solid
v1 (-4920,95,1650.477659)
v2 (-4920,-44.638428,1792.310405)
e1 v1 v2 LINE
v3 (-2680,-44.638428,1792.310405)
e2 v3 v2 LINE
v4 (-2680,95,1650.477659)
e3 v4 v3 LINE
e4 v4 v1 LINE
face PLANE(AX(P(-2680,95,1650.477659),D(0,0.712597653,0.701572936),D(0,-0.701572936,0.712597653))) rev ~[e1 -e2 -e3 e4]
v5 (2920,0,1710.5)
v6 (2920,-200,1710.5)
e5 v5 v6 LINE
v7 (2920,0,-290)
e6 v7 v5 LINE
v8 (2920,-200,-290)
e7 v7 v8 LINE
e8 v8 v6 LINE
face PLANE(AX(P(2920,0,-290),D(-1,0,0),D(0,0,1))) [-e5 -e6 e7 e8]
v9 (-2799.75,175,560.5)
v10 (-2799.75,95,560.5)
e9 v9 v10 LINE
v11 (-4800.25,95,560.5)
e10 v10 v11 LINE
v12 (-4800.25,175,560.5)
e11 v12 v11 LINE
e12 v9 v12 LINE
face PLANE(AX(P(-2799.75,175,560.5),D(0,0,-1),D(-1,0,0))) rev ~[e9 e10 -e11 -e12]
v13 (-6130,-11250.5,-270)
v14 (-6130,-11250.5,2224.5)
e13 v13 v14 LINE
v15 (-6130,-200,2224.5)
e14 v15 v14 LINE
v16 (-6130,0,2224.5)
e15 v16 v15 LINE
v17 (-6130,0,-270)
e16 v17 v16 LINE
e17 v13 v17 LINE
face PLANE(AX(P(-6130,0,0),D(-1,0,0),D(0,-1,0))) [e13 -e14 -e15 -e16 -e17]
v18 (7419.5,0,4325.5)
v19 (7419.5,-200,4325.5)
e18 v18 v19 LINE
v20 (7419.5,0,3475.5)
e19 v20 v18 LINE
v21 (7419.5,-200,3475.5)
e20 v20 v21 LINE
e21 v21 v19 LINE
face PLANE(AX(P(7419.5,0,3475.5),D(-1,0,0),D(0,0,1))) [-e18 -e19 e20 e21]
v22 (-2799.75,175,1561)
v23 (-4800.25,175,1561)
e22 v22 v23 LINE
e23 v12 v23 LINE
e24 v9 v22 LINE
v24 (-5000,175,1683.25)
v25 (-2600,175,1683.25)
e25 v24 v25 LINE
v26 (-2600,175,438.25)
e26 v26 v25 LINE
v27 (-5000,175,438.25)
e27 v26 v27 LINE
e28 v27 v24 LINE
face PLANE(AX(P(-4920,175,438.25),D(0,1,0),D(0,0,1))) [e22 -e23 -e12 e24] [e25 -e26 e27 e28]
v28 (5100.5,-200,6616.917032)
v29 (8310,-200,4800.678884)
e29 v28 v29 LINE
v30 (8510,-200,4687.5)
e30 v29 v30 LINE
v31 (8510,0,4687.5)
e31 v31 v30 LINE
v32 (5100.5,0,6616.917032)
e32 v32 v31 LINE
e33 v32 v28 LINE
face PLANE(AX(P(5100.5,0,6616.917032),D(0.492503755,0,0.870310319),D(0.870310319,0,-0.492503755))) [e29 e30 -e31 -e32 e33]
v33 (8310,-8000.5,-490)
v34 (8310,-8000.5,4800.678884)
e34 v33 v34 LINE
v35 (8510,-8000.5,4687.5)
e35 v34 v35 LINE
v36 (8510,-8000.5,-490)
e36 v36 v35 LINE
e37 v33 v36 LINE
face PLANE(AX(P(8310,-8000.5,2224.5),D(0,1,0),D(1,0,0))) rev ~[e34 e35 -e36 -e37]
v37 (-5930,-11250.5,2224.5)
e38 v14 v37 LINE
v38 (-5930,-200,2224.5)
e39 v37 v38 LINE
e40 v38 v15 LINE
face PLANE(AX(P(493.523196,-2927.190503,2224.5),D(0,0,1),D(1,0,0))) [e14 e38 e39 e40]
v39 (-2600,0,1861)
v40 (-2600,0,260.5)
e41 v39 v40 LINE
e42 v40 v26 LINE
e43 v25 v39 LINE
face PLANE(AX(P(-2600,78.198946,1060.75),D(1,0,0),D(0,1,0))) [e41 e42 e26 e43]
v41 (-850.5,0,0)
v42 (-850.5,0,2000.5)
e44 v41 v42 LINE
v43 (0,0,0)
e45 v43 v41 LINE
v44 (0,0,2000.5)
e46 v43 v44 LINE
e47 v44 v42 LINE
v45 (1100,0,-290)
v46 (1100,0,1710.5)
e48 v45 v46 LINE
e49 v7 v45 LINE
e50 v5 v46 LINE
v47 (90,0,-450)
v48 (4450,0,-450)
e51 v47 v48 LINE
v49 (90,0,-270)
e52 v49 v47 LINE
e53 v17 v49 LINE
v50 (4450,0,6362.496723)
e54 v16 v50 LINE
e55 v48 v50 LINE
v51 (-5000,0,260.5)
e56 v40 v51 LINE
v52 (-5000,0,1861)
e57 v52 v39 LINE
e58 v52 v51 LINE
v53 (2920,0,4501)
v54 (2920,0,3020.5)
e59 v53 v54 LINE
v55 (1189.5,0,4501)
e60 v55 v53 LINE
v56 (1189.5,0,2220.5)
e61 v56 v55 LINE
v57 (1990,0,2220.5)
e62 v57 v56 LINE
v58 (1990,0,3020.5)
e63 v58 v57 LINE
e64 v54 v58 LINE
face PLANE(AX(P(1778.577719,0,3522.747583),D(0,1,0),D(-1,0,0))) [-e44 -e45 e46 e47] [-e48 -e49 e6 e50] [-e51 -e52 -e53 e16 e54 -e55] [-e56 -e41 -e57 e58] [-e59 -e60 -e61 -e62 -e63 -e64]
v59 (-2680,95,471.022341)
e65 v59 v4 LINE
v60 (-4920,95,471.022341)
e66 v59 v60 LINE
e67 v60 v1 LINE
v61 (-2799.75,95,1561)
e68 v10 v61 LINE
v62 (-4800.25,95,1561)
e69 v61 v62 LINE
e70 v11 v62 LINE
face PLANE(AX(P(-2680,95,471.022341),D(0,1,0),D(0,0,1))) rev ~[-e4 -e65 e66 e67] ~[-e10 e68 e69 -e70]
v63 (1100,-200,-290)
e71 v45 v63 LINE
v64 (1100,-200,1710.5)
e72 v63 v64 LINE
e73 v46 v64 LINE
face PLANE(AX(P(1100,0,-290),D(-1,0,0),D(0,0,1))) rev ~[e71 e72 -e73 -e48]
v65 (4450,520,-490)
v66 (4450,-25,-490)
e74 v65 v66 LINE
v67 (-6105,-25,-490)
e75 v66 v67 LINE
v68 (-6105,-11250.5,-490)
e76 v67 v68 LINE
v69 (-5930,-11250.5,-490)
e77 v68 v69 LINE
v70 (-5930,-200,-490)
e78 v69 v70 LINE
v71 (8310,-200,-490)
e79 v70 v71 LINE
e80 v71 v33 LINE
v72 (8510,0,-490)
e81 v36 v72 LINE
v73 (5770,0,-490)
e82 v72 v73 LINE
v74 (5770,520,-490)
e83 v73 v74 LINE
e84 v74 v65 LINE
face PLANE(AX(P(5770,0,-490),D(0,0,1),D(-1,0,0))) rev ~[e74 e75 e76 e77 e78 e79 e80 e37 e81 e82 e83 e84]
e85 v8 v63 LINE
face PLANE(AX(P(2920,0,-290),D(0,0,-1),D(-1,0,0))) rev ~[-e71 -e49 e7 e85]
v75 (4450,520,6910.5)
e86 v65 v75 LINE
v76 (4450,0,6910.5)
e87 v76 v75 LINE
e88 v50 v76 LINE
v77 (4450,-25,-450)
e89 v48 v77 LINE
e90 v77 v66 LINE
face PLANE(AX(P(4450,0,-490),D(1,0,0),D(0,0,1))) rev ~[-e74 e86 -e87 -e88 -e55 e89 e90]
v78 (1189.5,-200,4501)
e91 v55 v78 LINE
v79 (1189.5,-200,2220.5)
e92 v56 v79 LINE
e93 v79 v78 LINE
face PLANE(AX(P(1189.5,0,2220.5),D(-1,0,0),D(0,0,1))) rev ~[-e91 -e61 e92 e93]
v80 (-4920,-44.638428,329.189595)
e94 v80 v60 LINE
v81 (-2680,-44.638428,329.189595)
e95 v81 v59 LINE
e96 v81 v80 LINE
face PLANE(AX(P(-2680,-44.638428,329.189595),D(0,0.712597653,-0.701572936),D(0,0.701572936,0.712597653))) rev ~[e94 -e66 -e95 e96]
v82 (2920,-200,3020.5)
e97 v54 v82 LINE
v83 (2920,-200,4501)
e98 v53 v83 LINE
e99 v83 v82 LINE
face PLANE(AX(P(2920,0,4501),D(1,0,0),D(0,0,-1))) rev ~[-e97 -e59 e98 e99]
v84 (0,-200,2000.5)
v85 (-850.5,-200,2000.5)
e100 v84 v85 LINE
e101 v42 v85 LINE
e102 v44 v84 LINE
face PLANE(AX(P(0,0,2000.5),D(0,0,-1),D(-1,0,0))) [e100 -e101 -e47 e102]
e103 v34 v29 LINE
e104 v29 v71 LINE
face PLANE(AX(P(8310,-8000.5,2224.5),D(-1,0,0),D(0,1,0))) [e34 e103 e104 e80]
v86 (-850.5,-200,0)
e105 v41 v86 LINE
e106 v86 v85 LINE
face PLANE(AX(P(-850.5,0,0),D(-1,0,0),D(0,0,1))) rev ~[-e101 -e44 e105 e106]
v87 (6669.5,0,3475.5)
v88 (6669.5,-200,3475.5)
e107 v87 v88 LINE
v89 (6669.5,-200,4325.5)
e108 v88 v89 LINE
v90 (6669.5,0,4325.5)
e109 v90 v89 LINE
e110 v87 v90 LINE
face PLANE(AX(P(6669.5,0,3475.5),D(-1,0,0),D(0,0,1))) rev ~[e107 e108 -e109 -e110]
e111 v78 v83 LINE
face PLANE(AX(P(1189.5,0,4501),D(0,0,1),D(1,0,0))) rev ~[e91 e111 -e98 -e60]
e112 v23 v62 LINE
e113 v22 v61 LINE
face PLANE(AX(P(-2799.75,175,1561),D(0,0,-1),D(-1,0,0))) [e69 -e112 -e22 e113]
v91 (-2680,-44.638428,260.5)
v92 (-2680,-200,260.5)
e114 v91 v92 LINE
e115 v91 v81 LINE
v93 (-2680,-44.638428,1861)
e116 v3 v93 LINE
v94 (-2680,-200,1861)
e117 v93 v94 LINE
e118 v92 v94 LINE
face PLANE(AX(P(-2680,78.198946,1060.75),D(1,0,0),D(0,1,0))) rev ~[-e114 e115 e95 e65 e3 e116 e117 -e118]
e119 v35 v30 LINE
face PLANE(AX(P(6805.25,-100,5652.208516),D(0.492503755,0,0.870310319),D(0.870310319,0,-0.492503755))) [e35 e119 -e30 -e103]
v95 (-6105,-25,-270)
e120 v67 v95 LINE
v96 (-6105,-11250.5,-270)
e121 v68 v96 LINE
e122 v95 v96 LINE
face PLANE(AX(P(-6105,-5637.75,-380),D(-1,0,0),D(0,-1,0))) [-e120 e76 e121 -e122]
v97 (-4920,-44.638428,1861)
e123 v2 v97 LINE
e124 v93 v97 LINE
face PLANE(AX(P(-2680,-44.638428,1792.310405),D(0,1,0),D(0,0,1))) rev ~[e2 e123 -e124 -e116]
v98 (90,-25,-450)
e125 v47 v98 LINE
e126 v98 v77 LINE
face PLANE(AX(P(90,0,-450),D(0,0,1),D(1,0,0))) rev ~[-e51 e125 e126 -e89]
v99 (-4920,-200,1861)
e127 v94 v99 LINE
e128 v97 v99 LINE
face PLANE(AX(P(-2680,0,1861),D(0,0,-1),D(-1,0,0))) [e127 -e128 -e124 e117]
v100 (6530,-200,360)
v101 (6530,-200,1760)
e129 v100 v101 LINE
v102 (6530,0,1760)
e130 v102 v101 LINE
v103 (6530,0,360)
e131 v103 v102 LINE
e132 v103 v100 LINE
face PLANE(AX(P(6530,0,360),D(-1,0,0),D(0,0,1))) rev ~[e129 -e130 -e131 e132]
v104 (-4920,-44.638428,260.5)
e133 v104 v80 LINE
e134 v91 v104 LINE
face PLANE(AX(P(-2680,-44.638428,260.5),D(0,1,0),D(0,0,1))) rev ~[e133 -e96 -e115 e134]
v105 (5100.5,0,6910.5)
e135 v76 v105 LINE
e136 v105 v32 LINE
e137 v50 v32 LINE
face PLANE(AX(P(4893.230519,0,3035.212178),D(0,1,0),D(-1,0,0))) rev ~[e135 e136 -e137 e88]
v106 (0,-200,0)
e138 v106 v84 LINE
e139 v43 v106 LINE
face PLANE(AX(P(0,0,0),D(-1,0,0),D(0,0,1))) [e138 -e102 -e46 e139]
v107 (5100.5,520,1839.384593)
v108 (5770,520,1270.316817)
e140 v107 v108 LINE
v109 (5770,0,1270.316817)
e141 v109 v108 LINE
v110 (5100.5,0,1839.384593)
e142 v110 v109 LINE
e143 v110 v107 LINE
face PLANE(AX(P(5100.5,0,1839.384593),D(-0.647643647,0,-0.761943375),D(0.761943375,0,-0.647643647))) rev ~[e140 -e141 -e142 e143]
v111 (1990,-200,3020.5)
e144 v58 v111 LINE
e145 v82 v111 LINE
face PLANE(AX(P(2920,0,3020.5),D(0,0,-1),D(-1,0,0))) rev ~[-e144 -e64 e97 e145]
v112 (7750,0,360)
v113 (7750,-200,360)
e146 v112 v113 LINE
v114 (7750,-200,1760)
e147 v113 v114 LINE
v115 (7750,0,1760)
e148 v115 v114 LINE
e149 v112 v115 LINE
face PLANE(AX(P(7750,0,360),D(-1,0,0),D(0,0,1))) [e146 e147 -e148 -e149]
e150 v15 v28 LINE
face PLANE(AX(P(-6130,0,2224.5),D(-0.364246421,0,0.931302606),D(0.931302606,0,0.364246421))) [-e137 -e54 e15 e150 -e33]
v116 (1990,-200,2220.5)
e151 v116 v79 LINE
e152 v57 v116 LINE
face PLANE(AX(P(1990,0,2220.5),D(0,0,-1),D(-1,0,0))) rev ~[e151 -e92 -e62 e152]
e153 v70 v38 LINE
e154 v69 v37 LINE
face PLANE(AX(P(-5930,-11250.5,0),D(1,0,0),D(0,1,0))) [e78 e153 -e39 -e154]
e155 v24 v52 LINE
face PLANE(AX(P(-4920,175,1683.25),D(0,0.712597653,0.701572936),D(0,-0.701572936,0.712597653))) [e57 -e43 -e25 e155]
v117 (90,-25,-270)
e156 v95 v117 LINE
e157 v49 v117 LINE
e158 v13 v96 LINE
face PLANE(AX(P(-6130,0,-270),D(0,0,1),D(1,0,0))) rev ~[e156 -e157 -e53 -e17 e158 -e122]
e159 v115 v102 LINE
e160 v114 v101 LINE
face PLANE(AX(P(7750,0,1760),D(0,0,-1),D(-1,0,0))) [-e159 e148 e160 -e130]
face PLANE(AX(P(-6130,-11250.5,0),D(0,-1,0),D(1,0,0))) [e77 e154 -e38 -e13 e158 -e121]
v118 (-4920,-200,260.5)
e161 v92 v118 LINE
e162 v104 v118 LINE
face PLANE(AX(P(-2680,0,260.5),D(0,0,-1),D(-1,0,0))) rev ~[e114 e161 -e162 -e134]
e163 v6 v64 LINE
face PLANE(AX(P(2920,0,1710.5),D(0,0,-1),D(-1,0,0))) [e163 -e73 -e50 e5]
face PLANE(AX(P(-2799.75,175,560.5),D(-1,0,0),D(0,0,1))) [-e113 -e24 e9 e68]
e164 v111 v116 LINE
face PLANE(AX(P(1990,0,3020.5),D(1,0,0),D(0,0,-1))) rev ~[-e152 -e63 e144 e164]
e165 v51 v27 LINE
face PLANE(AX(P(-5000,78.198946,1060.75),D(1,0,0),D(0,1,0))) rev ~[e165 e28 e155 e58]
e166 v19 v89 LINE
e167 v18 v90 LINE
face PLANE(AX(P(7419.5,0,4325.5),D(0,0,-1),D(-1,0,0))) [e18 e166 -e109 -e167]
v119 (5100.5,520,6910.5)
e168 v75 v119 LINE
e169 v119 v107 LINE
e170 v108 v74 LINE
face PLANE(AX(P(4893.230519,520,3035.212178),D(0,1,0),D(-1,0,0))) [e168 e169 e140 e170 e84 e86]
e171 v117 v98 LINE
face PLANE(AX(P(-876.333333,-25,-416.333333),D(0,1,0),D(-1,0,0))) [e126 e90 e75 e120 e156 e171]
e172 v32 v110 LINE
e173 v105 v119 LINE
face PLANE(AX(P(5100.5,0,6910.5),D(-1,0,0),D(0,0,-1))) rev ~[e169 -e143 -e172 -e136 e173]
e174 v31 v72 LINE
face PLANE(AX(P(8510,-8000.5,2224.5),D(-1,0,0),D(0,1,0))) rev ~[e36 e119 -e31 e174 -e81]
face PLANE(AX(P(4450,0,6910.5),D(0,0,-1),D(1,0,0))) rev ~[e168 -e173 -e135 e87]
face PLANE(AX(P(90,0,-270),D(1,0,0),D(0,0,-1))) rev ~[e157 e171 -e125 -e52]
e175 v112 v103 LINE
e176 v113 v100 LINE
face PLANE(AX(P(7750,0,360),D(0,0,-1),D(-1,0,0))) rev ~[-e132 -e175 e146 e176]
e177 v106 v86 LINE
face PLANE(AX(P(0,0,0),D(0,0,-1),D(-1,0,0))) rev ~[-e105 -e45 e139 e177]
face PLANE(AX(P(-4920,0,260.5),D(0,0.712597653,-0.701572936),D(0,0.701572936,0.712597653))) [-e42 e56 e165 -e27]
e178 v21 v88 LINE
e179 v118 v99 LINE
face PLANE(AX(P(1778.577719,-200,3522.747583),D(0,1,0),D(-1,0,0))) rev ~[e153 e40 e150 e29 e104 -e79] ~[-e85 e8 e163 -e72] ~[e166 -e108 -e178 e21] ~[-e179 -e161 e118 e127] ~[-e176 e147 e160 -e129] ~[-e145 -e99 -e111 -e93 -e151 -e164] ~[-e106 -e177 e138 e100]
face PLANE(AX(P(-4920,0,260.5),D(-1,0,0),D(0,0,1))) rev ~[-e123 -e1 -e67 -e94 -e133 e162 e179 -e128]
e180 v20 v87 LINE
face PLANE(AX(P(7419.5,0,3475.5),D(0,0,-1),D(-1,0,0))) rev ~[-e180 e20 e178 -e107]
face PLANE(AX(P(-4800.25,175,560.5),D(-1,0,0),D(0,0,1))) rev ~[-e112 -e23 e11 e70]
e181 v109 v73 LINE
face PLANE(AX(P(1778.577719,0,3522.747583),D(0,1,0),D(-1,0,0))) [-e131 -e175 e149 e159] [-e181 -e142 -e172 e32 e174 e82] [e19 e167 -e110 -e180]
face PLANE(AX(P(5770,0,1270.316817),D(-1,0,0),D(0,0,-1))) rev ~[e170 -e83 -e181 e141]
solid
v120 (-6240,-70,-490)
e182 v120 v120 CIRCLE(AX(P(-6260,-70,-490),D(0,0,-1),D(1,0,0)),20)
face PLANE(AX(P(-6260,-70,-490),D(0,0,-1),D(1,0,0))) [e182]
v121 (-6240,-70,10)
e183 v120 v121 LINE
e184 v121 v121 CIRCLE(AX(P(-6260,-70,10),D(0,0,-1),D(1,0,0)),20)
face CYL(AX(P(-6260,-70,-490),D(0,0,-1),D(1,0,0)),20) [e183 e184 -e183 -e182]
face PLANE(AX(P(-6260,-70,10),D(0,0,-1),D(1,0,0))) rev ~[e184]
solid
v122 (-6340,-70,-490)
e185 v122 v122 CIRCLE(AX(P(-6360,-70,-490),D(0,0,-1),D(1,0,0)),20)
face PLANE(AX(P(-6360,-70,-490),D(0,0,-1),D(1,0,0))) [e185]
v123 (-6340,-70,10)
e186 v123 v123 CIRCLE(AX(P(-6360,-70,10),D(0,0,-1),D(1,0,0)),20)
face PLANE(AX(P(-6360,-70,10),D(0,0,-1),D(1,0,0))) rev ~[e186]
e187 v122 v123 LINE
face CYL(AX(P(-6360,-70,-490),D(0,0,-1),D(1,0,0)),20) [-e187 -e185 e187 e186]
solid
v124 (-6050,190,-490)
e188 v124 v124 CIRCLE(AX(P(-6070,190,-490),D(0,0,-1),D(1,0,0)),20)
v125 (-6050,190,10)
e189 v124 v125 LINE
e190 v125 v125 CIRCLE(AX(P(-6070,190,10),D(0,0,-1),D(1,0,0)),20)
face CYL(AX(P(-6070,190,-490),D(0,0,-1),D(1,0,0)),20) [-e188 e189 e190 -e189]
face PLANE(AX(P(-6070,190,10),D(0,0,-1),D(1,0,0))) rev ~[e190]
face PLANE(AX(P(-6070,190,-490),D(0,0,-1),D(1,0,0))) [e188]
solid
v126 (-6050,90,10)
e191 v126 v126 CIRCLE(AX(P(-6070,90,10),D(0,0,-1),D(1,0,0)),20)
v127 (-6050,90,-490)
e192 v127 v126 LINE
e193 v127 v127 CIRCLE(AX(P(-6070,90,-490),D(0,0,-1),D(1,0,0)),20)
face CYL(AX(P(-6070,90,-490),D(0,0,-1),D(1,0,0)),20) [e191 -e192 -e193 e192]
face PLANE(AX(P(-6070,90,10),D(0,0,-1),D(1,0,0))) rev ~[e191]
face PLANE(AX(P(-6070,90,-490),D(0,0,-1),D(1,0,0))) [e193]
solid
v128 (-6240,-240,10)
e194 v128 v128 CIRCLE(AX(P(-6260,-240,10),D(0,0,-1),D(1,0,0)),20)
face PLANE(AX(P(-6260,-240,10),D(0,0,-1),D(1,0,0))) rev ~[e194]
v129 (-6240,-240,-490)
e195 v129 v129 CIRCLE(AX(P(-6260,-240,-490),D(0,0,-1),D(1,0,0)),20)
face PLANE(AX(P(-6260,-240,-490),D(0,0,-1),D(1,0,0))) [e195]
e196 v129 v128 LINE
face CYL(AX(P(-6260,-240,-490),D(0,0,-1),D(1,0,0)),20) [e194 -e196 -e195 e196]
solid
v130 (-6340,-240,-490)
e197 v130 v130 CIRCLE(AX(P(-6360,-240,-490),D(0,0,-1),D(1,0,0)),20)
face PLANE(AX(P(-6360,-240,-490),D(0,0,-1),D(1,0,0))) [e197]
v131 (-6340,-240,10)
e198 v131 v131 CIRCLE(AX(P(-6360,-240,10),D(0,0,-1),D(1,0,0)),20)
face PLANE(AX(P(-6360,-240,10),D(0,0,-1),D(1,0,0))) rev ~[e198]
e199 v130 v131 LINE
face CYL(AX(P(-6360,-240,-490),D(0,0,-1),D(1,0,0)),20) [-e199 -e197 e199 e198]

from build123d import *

# Parameters (mm, degrees)
F1_DEPTH      = 2224.5
F1_DEPTH_BACK = 490
F2_W          = 850.5
F2_H          = 2000.5
F2_W_2        = 1820
F2_W_3        = 1220
F2_H_2        = 1400
F3_DEPTH      = 200
F4_W          = 2240
F4_H          = 1600.5
F5_DEPTH      = 200
F7_DEPTH      = 2240
F9_DEPTH      = 80
F10_START     = -2320
F10_DEPTH     = 80
F11_W         = 2000.5
F11_H         = 1000.5
F12_DEPTH     = 80
F14_DEPTH     = 200
F14_FACE_W    = 200
F14_FACE_H    = 7800.5
F15_REACH     = 12195.4815488388
F2_W_4        = 750
F2_H_3        = 850
F16_DEPTH     = 200
F18_DEPTH     = 200
F20_DEPTH     = 520
F22_DEPTH     = 25
F23_W         = 11225.5
F23_H         = 220
F24_DEPTH     = 25
F25_R         = 20
F26_DEPTH     = 500


with BuildPart() as f1:
    # F0 (on Top) → F1 (new body, two sides)
    with BuildSketch(Plane.XY) as f1_sk:
        Polygon((8510, 0), (-6130, 0), (-6130, -11250.5), (-5930, -11250.5), (-5930, -200), (8310, -200), (8310, -8000.5), (8510, -8000.5), align=None)
    extrude(amount=F1_DEPTH)
    extrude(f1_sk.sketch, amount=-F1_DEPTH_BACK)

    # F2 (on face) → F3 (cut, through all)
    with BuildSketch(Plane(origin=(0, 0, 0), x_dir=(-1, 0, 0), z_dir=(0, 1, 0))):
        with Locations((425.25, 1000.25)):
            Rectangle(F2_W, F2_H)
        with Locations((-2010, 710.25)):
            Rectangle(F2_W_2, F2_H)
        with Locations((-7140, 1060)):
            Rectangle(F2_W_3, F2_H_2)
    extrude(amount=-F3_DEPTH, mode=Mode.SUBTRACT)

    # F4 (on face) → F5 (cut, through all)
    with BuildSketch(Plane(origin=(0, 0, 0), x_dir=(-1, 0, 0), z_dir=(0, 1, 0))):
        with Locations((3800, 1060.75)):
            Rectangle(F4_W, F4_H)
    extrude(amount=-F5_DEPTH, mode=Mode.SUBTRACT)

    # F6 (on face) → F7 (join, through all)
    with BuildSketch(Plane(origin=(-2680, 0, 0), x_dir=(0, -1, 0), z_dir=(-1, 0, 0))):
        Polygon((44.6384282427, 1861), (0, 1861), (-175, 1683.25), (-175, 438.25), (0, 260.5), (44.6384282427, 260.5), (44.6384282427, 329.1895949349), (-95, 471.0223413358), (-95, 1650.4776586642), (44.6384282427, 1792.310405065), align=None)
    extrude(amount=F7_DEPTH)

    # F8 (on face) → F9 (join)
    with BuildSketch(Plane.YZ.offset(-2680)):
        Polygon((175, 438.25), (175, 1683.25), (0, 1861), (0, 260.5), align=None)
    extrude(amount=F9_DEPTH)

    # F9_face (on face) → F10 (join)
    with BuildSketch(Plane(origin=(-2600, 83.8560885609, 1060.75), x_dir=(0, 1, 0), z_dir=(1, 0, 0)).offset(F10_START)):
        Polygon((91.1439114391, -622.5), (91.1439114391, 622.5), (-83.8560885609, 800.25), (-83.8560885609, -800.25), align=None)
    extrude(amount=-F10_DEPTH)

    # F11 (on face) → F12 (cut, through all)
    with BuildSketch(Plane(origin=(0, 175, 0), x_dir=(-1, 0, 0), z_dir=(0, 1, 0))):
        with Locations((3800, 1060.7499999998)):
            Rectangle(F11_W, F11_H)
    extrude(amount=-F12_DEPTH, mode=Mode.SUBTRACT)

    # F13 (on face) → F14 (join, through all)
    with BuildSketch(Plane(origin=(0, 0, 0), x_dir=(-1, 0, 0), z_dir=(0, 1, 0))):
        Polygon((6130, 2224.5), (-5100.5, 6616.9170318604), (-8510, 4687.5), (-8510, 2224.5), align=None)
    extrude(amount=-F14_DEPTH)

    f15_end = Plane(origin=(6805.25, -100, 5652.2085159302), x_dir=(0.870310319, 0, -0.4925037549), z_dir=(0.4925037549, 0, 0.870310319))
    # F14_face (on face) → F15 (join, up to a plane its end follows)
    with BuildSketch(Plane(origin=(8410, -4100.25, 2224.5), x_dir=(1, 0, 0), z_dir=(0, 0, 1))):
        Rectangle(F14_FACE_W, F14_FACE_H)
    f15_long = extrude(amount=F15_REACH, mode=Mode.PRIVATE)
    add(split(f15_long, bisect_by=f15_end, keep=Keep.BOTTOM, mode=Mode.PRIVATE))

    # F2 (on face) → F16 (cut, through all)
    with BuildSketch(Plane(origin=(0, 0, 0), x_dir=(-1, 0, 0), z_dir=(0, 1, 0))):
        with Locations((-7044.5, 3900.5)):
            Rectangle(F2_W_4, F2_H_3)
    extrude(amount=-F16_DEPTH, mode=Mode.SUBTRACT)

    # F17 (on face) → F18 (cut, through all)
    with BuildSketch(Plane(origin=(0, 0, 0), x_dir=(-1, 0, 0), z_dir=(0, 1, 0))):
        Polygon((-2920, 4501), (-2920, 3020.5), (-1990, 3020.5), (-1990, 2220.5), (-1189.5, 2220.5), (-1189.5, 4501), align=None)
    extrude(amount=-F18_DEPTH, mode=Mode.SUBTRACT)

    # F19 (on face) → F20 (join)
    with BuildSketch(Plane(origin=(0, 0, 0), x_dir=(-1, 0, 0), z_dir=(0, 1, 0))):
        Polygon((-4450, 6910.5), (-5100.5, 6910.5), (-5100.5, 1839.3845928857), (-5770, 1270.3168166825), (-5770, -490), (-4450, -490), align=None)
    extrude(amount=F20_DEPTH)

    # F21 (on face) → F22 (cut)
    with BuildSketch(Plane(origin=(0, 0, 0), x_dir=(-1, 0, 0), z_dir=(0, 1, 0))):
        Polygon((6130, -490), (6130, -270), (-90, -270), (-90, -450), (-4450, -450), (-4450, -490), align=None)
    extrude(amount=-F22_DEPTH, mode=Mode.SUBTRACT)

    # F23 (on face) → F24 (cut)
    with BuildSketch(Plane(origin=(-6130, 0, 0), x_dir=(0, -1, 0), z_dir=(-1, 0, 0))):
        with Locations((5637.75, -380)):
            Rectangle(F23_W, F23_H)
    extrude(amount=-F24_DEPTH, mode=Mode.SUBTRACT)


with BuildPart() as f26:
    # F25 (on face) → F26 (new body)
    with BuildSketch(Plane(origin=(0, 0, -490), x_dir=(1, 0, 0), z_dir=(0, 0, -1))):
        with Locations((-6070, -190)):
            Circle(F25_R)
    extrude(amount=-F26_DEPTH)


with BuildPart() as f26b:
    # F25 (on face) → F26, piece 2 (new body)
    with BuildSketch(Plane(origin=(0, 0, -490), x_dir=(1, 0, 0), z_dir=(0, 0, -1))):
        with Locations((-6070, -90)):
            Circle(F25_R)
    extrude(amount=-F26_DEPTH)


with BuildPart() as f26c:
    # F25 (on face) → F26, piece 3 (new body)
    with BuildSketch(Plane(origin=(0, 0, -490), x_dir=(1, 0, 0), z_dir=(0, 0, -1))):
        with Locations((-6260, 70)):
            Circle(F25_R)
    extrude(amount=-F26_DEPTH)


with BuildPart() as f26d:
    # F25 (on face) → F26, piece 4 (new body)
    with BuildSketch(Plane(origin=(0, 0, -490), x_dir=(1, 0, 0), z_dir=(0, 0, -1))):
        with Locations((-6260, 240)):
            Circle(F25_R)
    extrude(amount=-F26_DEPTH)


with BuildPart() as f26e:
    # F25 (on face) → F26, piece 5 (new body)
    with BuildSketch(Plane(origin=(0, 0, -490), x_dir=(1, 0, 0), z_dir=(0, 0, -1))):
        with Locations((-6360, 240)):
            Circle(F25_R)
    extrude(amount=-F26_DEPTH)


with BuildPart() as f26f:
    # F25 (on face) → F26, piece 6 (new body)
    with BuildSketch(Plane(origin=(0, 0, -490), x_dir=(1, 0, 0), z_dir=(0, 0, -1))):
        with Locations((-6360, 70)):
            Circle(F25_R)
    extrude(amount=-F26_DEPTH)


solid = Compound([f1.part, f26.part, f26b.part, f26c.part, f26d.part, f26e.part, f26f.part])
